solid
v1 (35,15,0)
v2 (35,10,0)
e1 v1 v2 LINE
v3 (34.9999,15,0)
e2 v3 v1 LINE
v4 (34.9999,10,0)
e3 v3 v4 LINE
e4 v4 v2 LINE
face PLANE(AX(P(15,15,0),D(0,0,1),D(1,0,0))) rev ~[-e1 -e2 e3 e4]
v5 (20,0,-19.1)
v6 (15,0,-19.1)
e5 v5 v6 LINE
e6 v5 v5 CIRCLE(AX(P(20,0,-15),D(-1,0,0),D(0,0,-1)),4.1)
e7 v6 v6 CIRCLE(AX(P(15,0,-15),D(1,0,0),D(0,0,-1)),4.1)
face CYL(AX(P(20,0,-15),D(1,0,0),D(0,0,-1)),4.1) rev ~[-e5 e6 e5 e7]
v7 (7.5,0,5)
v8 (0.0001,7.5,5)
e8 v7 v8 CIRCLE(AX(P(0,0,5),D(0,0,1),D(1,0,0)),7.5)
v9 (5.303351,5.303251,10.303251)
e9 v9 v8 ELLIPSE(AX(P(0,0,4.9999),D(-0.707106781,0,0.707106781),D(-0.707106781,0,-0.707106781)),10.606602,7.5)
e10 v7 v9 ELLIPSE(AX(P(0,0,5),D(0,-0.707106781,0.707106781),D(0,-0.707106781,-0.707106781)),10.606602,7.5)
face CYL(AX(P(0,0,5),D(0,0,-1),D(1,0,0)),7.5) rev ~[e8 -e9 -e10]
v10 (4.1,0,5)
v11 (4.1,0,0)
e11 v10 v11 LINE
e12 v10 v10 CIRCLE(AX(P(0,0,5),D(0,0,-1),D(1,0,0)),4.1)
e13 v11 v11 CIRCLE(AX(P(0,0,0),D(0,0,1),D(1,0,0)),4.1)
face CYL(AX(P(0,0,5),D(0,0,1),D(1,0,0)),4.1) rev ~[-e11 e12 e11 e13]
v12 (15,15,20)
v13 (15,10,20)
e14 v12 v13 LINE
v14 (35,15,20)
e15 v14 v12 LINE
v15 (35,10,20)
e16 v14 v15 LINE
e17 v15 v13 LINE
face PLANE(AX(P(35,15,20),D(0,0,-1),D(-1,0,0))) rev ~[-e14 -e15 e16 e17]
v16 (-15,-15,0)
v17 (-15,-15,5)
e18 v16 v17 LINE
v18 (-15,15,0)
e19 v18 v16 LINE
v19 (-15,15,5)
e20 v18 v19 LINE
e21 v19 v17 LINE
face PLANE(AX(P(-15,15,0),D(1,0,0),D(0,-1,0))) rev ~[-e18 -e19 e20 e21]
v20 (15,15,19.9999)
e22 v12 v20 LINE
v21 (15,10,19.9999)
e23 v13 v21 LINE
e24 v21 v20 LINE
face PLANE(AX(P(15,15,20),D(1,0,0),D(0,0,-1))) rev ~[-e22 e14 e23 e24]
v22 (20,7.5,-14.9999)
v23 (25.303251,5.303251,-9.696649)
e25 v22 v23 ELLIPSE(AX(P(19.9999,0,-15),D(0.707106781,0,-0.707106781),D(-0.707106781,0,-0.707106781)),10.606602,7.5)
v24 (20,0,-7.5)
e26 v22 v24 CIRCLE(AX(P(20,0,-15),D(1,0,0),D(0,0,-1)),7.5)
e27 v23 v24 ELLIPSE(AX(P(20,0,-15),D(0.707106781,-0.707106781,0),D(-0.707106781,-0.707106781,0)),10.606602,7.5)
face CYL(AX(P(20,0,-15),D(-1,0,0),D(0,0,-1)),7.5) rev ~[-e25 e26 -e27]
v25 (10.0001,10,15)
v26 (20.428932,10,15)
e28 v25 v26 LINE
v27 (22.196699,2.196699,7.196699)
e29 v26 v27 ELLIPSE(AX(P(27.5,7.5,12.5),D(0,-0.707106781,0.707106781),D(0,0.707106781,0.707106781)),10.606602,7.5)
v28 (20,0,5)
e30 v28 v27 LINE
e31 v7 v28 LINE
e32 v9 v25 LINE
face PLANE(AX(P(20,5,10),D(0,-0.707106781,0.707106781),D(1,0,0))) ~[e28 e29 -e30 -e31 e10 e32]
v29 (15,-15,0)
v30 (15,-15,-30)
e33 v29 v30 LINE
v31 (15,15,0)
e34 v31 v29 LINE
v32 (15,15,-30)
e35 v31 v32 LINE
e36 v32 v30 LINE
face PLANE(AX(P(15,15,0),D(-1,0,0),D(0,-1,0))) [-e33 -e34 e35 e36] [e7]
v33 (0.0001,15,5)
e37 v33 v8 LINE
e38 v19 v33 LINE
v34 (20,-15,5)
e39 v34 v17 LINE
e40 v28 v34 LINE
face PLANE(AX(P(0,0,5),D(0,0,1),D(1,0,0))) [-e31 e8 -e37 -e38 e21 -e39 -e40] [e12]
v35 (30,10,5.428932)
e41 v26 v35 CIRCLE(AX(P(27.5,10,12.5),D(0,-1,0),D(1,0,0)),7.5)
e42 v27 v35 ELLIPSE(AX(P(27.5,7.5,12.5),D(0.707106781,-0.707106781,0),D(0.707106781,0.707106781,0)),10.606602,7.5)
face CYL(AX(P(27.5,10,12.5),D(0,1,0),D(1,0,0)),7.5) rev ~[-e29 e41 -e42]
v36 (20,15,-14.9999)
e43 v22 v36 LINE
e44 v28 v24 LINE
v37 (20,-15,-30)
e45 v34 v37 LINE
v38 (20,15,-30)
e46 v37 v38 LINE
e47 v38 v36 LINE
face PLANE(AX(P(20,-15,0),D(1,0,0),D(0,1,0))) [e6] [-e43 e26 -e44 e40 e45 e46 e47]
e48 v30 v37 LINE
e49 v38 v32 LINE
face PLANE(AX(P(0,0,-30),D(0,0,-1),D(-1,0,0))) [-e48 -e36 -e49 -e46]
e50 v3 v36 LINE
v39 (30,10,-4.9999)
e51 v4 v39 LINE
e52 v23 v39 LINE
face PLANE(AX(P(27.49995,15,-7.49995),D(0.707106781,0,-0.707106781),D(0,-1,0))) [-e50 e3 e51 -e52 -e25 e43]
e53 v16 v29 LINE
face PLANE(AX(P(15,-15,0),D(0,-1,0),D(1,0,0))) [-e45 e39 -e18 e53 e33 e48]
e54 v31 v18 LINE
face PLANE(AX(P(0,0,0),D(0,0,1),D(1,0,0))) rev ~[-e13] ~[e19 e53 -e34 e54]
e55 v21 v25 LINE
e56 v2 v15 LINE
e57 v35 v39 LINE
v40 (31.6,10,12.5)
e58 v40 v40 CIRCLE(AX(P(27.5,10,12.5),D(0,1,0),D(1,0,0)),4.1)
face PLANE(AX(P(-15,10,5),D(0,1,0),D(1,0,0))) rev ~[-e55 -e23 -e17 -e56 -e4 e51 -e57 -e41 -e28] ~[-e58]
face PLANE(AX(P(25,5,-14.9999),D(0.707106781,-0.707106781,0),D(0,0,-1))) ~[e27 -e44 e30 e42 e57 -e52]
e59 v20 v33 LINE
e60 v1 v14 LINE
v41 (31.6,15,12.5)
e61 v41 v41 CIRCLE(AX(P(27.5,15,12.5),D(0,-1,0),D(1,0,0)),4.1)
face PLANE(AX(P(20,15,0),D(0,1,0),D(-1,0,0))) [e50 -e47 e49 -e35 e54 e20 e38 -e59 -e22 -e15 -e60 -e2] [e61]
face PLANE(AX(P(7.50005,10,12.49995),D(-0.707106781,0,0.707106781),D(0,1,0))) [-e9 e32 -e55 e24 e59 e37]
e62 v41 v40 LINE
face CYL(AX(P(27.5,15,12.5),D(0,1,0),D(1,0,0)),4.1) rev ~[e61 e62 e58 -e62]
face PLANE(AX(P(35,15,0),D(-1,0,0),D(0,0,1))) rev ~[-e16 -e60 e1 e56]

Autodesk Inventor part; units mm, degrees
ref_plane "YZ Plane" through (0, 0, 0) normal (1, 0, 0) x (0, 1, 0)
ref_plane "XZ Plane" through (0, 0, 0) normal (0, 1, 0) x (-1, 0, 0)
ref_plane "XY Plane" through (0, 0, 0) normal (0, 0, 1) x (1, 0, 0)
sketch "Эскиз1" plane through (0, 0, 0) normal (0, 0, 1) x (1, 0, 0)
  line L0 (-15, -15) -> (15, -15)
  line L1 (15, -15) -> (15, 15)
  line L2 (15, 15) -> (-15, 15)
  line L3 (-15, 15) -> (-15, -15)
  line L4 (-15, -15) -> (15, 15) construction
  line L5 (15, -15) -> (-15, 15) construction
  line L6 (15, 15) -> (20, 15)
  line L7 (20, 15) -> (20, -15)
  line L8 (20, -15) -> (15, -15)
  line L9 (15, -15) -> (15, 15)
  point P0 (0, 0)
  dimension "d0" = 30
  dimension "d1" = 30
  dimension "d2" = 5
extrude "Выдавливание1" add sketch "Эскиз1" along normal blind 5
sketch "Эскиз2" plane through (0, 0, 0) normal (0, 0, -1) x (-1, 0, 0)
  line L0 (-20, -15) -> (-20, 15) projected
  line L1 (15, -15) -> (-20, -15) projected
  line L2 (-20, 15) -> (-15, 15)
  line L3 (-15, 15) -> (-15, -15)
  line L4 (-15, -15) -> (-20, -15)
  line L5 (-20, -15) -> (-20, 15)
  point P0 (0, 0)
  dimension "d7" = 5
extrude "Выдавливание2" add sketch "Эскиз2" along normal blind 30
sketch "Эскиз3" plane through (0, 0, 5) normal (0, 0, 1) x (1, 0, 0)
  line L0 (-15, 15) -> (-15, -15) projected
  line L1 (-15, 0) -> (0, 0)
  circle A0 centre (0, 0) radius 4.1
  dimension "d10" = 15
  dimension "d11" = 8.2
sketch "Эскиз4" plane through (20, -15, 5) normal (1, 0, 0) x (0, 0, -1)
  line L0 (35, 30) -> (35, 0) projected
  line L1 (35, 15) -> (20, 15)
  circle A0 centre (20, 15) radius 4.1
  point P0 (5, 15)
  dimension "d12" = 15
  dimension "d13" = 8.2
sketch "Эскиз5" plane through (-15, 15, 5) normal (0, 1, 0) x (1, 0, 0)
  line L0 (30, 5) -> (30, 35) projected
  line L1 (30, 5) -> (50, 5)
  line L2 (50, 5) -> (50, -15)
  line L3 (50, -15) -> (30, -15)
  line L4 (30, -15) -> (30, 5)
  point P0 (15, 5)
  dimension "d18" = 20
  dimension "d19" = 20
extrude "Выдавливание5" add sketch "Эскиз5" against normal blind 5
chamfer "Фаска1" distance 15 angle 45 2 edges at (20, 12.5, 0) (15, 12.5, 5)
chamfer "Фаска2" distance 10 angle 45 2 edges at (17.5, 10, 5) (20, 10, 2.5)
extrude "Выдавливание6" cut sketch "Эскиз3" along normal blind 5 and the other way blind 16.25
extrude "Выдавливание7" cut sketch "Эскиз4" along normal blind 5 and the other way blind 11.5
sketch "Эскиз6" plane through (0, 0, 5) normal (0, 0, 1) x (1, 0, 0)
  circle A0 centre (0, 0) radius 7.5
  dimension "d38" = 15
extrude "Выдавливание8" cut sketch "Эскиз6" along normal blind 10.5
sketch "Эскиз7" plane through (20, -15, -30) normal (1, 0, 0) x (0, 0, -1)
  arc A0 (-19.1, 15) -> (-15, 19.1) centre (-15, 15) ccw projected
  circle A1 centre (-15, 15) radius 7.5
  point P0 (-30, 15)
  point P1 (-15, 10.9)
  dimension "d41" = 15
extrude "Выдавливание9" cut sketch "Эскиз7" along normal blind 10.5
sketch "Эскиз8" plane through (-15, 15, 5) normal (0, 1, 0) x (1, 0, 0)
  line L0 (35, 0) -> (45, -10) projected
  circle A0 centre (42.5, -7.5) radius 4.1
  point P0 (15, 5)
  point P1 (50, -15)
  dimension "d44" = 8.2
extrude "Выдавливание10" cut sketch "Эскиз8" against normal blind 17.25
sketch "Эскиз9" plane through (-15, 10, 5) normal (0, -1, 0) x (1, 0, 0)
  arc A0 (39.2504, 10) -> (39.6009, 4.6009) centre (42.5, 7.5) ccw projected
  circle A1 centre (42.5, 7.5) radius 7.5
  point P0 (15, -5)
  dimension "d47" = 15
extrude "Выдавливание11" cut sketch "Эскиз9" along normal blind 24
properties part number "КВ33.044.003 - крепеж дна блока управления" material "Пластик АБС"
